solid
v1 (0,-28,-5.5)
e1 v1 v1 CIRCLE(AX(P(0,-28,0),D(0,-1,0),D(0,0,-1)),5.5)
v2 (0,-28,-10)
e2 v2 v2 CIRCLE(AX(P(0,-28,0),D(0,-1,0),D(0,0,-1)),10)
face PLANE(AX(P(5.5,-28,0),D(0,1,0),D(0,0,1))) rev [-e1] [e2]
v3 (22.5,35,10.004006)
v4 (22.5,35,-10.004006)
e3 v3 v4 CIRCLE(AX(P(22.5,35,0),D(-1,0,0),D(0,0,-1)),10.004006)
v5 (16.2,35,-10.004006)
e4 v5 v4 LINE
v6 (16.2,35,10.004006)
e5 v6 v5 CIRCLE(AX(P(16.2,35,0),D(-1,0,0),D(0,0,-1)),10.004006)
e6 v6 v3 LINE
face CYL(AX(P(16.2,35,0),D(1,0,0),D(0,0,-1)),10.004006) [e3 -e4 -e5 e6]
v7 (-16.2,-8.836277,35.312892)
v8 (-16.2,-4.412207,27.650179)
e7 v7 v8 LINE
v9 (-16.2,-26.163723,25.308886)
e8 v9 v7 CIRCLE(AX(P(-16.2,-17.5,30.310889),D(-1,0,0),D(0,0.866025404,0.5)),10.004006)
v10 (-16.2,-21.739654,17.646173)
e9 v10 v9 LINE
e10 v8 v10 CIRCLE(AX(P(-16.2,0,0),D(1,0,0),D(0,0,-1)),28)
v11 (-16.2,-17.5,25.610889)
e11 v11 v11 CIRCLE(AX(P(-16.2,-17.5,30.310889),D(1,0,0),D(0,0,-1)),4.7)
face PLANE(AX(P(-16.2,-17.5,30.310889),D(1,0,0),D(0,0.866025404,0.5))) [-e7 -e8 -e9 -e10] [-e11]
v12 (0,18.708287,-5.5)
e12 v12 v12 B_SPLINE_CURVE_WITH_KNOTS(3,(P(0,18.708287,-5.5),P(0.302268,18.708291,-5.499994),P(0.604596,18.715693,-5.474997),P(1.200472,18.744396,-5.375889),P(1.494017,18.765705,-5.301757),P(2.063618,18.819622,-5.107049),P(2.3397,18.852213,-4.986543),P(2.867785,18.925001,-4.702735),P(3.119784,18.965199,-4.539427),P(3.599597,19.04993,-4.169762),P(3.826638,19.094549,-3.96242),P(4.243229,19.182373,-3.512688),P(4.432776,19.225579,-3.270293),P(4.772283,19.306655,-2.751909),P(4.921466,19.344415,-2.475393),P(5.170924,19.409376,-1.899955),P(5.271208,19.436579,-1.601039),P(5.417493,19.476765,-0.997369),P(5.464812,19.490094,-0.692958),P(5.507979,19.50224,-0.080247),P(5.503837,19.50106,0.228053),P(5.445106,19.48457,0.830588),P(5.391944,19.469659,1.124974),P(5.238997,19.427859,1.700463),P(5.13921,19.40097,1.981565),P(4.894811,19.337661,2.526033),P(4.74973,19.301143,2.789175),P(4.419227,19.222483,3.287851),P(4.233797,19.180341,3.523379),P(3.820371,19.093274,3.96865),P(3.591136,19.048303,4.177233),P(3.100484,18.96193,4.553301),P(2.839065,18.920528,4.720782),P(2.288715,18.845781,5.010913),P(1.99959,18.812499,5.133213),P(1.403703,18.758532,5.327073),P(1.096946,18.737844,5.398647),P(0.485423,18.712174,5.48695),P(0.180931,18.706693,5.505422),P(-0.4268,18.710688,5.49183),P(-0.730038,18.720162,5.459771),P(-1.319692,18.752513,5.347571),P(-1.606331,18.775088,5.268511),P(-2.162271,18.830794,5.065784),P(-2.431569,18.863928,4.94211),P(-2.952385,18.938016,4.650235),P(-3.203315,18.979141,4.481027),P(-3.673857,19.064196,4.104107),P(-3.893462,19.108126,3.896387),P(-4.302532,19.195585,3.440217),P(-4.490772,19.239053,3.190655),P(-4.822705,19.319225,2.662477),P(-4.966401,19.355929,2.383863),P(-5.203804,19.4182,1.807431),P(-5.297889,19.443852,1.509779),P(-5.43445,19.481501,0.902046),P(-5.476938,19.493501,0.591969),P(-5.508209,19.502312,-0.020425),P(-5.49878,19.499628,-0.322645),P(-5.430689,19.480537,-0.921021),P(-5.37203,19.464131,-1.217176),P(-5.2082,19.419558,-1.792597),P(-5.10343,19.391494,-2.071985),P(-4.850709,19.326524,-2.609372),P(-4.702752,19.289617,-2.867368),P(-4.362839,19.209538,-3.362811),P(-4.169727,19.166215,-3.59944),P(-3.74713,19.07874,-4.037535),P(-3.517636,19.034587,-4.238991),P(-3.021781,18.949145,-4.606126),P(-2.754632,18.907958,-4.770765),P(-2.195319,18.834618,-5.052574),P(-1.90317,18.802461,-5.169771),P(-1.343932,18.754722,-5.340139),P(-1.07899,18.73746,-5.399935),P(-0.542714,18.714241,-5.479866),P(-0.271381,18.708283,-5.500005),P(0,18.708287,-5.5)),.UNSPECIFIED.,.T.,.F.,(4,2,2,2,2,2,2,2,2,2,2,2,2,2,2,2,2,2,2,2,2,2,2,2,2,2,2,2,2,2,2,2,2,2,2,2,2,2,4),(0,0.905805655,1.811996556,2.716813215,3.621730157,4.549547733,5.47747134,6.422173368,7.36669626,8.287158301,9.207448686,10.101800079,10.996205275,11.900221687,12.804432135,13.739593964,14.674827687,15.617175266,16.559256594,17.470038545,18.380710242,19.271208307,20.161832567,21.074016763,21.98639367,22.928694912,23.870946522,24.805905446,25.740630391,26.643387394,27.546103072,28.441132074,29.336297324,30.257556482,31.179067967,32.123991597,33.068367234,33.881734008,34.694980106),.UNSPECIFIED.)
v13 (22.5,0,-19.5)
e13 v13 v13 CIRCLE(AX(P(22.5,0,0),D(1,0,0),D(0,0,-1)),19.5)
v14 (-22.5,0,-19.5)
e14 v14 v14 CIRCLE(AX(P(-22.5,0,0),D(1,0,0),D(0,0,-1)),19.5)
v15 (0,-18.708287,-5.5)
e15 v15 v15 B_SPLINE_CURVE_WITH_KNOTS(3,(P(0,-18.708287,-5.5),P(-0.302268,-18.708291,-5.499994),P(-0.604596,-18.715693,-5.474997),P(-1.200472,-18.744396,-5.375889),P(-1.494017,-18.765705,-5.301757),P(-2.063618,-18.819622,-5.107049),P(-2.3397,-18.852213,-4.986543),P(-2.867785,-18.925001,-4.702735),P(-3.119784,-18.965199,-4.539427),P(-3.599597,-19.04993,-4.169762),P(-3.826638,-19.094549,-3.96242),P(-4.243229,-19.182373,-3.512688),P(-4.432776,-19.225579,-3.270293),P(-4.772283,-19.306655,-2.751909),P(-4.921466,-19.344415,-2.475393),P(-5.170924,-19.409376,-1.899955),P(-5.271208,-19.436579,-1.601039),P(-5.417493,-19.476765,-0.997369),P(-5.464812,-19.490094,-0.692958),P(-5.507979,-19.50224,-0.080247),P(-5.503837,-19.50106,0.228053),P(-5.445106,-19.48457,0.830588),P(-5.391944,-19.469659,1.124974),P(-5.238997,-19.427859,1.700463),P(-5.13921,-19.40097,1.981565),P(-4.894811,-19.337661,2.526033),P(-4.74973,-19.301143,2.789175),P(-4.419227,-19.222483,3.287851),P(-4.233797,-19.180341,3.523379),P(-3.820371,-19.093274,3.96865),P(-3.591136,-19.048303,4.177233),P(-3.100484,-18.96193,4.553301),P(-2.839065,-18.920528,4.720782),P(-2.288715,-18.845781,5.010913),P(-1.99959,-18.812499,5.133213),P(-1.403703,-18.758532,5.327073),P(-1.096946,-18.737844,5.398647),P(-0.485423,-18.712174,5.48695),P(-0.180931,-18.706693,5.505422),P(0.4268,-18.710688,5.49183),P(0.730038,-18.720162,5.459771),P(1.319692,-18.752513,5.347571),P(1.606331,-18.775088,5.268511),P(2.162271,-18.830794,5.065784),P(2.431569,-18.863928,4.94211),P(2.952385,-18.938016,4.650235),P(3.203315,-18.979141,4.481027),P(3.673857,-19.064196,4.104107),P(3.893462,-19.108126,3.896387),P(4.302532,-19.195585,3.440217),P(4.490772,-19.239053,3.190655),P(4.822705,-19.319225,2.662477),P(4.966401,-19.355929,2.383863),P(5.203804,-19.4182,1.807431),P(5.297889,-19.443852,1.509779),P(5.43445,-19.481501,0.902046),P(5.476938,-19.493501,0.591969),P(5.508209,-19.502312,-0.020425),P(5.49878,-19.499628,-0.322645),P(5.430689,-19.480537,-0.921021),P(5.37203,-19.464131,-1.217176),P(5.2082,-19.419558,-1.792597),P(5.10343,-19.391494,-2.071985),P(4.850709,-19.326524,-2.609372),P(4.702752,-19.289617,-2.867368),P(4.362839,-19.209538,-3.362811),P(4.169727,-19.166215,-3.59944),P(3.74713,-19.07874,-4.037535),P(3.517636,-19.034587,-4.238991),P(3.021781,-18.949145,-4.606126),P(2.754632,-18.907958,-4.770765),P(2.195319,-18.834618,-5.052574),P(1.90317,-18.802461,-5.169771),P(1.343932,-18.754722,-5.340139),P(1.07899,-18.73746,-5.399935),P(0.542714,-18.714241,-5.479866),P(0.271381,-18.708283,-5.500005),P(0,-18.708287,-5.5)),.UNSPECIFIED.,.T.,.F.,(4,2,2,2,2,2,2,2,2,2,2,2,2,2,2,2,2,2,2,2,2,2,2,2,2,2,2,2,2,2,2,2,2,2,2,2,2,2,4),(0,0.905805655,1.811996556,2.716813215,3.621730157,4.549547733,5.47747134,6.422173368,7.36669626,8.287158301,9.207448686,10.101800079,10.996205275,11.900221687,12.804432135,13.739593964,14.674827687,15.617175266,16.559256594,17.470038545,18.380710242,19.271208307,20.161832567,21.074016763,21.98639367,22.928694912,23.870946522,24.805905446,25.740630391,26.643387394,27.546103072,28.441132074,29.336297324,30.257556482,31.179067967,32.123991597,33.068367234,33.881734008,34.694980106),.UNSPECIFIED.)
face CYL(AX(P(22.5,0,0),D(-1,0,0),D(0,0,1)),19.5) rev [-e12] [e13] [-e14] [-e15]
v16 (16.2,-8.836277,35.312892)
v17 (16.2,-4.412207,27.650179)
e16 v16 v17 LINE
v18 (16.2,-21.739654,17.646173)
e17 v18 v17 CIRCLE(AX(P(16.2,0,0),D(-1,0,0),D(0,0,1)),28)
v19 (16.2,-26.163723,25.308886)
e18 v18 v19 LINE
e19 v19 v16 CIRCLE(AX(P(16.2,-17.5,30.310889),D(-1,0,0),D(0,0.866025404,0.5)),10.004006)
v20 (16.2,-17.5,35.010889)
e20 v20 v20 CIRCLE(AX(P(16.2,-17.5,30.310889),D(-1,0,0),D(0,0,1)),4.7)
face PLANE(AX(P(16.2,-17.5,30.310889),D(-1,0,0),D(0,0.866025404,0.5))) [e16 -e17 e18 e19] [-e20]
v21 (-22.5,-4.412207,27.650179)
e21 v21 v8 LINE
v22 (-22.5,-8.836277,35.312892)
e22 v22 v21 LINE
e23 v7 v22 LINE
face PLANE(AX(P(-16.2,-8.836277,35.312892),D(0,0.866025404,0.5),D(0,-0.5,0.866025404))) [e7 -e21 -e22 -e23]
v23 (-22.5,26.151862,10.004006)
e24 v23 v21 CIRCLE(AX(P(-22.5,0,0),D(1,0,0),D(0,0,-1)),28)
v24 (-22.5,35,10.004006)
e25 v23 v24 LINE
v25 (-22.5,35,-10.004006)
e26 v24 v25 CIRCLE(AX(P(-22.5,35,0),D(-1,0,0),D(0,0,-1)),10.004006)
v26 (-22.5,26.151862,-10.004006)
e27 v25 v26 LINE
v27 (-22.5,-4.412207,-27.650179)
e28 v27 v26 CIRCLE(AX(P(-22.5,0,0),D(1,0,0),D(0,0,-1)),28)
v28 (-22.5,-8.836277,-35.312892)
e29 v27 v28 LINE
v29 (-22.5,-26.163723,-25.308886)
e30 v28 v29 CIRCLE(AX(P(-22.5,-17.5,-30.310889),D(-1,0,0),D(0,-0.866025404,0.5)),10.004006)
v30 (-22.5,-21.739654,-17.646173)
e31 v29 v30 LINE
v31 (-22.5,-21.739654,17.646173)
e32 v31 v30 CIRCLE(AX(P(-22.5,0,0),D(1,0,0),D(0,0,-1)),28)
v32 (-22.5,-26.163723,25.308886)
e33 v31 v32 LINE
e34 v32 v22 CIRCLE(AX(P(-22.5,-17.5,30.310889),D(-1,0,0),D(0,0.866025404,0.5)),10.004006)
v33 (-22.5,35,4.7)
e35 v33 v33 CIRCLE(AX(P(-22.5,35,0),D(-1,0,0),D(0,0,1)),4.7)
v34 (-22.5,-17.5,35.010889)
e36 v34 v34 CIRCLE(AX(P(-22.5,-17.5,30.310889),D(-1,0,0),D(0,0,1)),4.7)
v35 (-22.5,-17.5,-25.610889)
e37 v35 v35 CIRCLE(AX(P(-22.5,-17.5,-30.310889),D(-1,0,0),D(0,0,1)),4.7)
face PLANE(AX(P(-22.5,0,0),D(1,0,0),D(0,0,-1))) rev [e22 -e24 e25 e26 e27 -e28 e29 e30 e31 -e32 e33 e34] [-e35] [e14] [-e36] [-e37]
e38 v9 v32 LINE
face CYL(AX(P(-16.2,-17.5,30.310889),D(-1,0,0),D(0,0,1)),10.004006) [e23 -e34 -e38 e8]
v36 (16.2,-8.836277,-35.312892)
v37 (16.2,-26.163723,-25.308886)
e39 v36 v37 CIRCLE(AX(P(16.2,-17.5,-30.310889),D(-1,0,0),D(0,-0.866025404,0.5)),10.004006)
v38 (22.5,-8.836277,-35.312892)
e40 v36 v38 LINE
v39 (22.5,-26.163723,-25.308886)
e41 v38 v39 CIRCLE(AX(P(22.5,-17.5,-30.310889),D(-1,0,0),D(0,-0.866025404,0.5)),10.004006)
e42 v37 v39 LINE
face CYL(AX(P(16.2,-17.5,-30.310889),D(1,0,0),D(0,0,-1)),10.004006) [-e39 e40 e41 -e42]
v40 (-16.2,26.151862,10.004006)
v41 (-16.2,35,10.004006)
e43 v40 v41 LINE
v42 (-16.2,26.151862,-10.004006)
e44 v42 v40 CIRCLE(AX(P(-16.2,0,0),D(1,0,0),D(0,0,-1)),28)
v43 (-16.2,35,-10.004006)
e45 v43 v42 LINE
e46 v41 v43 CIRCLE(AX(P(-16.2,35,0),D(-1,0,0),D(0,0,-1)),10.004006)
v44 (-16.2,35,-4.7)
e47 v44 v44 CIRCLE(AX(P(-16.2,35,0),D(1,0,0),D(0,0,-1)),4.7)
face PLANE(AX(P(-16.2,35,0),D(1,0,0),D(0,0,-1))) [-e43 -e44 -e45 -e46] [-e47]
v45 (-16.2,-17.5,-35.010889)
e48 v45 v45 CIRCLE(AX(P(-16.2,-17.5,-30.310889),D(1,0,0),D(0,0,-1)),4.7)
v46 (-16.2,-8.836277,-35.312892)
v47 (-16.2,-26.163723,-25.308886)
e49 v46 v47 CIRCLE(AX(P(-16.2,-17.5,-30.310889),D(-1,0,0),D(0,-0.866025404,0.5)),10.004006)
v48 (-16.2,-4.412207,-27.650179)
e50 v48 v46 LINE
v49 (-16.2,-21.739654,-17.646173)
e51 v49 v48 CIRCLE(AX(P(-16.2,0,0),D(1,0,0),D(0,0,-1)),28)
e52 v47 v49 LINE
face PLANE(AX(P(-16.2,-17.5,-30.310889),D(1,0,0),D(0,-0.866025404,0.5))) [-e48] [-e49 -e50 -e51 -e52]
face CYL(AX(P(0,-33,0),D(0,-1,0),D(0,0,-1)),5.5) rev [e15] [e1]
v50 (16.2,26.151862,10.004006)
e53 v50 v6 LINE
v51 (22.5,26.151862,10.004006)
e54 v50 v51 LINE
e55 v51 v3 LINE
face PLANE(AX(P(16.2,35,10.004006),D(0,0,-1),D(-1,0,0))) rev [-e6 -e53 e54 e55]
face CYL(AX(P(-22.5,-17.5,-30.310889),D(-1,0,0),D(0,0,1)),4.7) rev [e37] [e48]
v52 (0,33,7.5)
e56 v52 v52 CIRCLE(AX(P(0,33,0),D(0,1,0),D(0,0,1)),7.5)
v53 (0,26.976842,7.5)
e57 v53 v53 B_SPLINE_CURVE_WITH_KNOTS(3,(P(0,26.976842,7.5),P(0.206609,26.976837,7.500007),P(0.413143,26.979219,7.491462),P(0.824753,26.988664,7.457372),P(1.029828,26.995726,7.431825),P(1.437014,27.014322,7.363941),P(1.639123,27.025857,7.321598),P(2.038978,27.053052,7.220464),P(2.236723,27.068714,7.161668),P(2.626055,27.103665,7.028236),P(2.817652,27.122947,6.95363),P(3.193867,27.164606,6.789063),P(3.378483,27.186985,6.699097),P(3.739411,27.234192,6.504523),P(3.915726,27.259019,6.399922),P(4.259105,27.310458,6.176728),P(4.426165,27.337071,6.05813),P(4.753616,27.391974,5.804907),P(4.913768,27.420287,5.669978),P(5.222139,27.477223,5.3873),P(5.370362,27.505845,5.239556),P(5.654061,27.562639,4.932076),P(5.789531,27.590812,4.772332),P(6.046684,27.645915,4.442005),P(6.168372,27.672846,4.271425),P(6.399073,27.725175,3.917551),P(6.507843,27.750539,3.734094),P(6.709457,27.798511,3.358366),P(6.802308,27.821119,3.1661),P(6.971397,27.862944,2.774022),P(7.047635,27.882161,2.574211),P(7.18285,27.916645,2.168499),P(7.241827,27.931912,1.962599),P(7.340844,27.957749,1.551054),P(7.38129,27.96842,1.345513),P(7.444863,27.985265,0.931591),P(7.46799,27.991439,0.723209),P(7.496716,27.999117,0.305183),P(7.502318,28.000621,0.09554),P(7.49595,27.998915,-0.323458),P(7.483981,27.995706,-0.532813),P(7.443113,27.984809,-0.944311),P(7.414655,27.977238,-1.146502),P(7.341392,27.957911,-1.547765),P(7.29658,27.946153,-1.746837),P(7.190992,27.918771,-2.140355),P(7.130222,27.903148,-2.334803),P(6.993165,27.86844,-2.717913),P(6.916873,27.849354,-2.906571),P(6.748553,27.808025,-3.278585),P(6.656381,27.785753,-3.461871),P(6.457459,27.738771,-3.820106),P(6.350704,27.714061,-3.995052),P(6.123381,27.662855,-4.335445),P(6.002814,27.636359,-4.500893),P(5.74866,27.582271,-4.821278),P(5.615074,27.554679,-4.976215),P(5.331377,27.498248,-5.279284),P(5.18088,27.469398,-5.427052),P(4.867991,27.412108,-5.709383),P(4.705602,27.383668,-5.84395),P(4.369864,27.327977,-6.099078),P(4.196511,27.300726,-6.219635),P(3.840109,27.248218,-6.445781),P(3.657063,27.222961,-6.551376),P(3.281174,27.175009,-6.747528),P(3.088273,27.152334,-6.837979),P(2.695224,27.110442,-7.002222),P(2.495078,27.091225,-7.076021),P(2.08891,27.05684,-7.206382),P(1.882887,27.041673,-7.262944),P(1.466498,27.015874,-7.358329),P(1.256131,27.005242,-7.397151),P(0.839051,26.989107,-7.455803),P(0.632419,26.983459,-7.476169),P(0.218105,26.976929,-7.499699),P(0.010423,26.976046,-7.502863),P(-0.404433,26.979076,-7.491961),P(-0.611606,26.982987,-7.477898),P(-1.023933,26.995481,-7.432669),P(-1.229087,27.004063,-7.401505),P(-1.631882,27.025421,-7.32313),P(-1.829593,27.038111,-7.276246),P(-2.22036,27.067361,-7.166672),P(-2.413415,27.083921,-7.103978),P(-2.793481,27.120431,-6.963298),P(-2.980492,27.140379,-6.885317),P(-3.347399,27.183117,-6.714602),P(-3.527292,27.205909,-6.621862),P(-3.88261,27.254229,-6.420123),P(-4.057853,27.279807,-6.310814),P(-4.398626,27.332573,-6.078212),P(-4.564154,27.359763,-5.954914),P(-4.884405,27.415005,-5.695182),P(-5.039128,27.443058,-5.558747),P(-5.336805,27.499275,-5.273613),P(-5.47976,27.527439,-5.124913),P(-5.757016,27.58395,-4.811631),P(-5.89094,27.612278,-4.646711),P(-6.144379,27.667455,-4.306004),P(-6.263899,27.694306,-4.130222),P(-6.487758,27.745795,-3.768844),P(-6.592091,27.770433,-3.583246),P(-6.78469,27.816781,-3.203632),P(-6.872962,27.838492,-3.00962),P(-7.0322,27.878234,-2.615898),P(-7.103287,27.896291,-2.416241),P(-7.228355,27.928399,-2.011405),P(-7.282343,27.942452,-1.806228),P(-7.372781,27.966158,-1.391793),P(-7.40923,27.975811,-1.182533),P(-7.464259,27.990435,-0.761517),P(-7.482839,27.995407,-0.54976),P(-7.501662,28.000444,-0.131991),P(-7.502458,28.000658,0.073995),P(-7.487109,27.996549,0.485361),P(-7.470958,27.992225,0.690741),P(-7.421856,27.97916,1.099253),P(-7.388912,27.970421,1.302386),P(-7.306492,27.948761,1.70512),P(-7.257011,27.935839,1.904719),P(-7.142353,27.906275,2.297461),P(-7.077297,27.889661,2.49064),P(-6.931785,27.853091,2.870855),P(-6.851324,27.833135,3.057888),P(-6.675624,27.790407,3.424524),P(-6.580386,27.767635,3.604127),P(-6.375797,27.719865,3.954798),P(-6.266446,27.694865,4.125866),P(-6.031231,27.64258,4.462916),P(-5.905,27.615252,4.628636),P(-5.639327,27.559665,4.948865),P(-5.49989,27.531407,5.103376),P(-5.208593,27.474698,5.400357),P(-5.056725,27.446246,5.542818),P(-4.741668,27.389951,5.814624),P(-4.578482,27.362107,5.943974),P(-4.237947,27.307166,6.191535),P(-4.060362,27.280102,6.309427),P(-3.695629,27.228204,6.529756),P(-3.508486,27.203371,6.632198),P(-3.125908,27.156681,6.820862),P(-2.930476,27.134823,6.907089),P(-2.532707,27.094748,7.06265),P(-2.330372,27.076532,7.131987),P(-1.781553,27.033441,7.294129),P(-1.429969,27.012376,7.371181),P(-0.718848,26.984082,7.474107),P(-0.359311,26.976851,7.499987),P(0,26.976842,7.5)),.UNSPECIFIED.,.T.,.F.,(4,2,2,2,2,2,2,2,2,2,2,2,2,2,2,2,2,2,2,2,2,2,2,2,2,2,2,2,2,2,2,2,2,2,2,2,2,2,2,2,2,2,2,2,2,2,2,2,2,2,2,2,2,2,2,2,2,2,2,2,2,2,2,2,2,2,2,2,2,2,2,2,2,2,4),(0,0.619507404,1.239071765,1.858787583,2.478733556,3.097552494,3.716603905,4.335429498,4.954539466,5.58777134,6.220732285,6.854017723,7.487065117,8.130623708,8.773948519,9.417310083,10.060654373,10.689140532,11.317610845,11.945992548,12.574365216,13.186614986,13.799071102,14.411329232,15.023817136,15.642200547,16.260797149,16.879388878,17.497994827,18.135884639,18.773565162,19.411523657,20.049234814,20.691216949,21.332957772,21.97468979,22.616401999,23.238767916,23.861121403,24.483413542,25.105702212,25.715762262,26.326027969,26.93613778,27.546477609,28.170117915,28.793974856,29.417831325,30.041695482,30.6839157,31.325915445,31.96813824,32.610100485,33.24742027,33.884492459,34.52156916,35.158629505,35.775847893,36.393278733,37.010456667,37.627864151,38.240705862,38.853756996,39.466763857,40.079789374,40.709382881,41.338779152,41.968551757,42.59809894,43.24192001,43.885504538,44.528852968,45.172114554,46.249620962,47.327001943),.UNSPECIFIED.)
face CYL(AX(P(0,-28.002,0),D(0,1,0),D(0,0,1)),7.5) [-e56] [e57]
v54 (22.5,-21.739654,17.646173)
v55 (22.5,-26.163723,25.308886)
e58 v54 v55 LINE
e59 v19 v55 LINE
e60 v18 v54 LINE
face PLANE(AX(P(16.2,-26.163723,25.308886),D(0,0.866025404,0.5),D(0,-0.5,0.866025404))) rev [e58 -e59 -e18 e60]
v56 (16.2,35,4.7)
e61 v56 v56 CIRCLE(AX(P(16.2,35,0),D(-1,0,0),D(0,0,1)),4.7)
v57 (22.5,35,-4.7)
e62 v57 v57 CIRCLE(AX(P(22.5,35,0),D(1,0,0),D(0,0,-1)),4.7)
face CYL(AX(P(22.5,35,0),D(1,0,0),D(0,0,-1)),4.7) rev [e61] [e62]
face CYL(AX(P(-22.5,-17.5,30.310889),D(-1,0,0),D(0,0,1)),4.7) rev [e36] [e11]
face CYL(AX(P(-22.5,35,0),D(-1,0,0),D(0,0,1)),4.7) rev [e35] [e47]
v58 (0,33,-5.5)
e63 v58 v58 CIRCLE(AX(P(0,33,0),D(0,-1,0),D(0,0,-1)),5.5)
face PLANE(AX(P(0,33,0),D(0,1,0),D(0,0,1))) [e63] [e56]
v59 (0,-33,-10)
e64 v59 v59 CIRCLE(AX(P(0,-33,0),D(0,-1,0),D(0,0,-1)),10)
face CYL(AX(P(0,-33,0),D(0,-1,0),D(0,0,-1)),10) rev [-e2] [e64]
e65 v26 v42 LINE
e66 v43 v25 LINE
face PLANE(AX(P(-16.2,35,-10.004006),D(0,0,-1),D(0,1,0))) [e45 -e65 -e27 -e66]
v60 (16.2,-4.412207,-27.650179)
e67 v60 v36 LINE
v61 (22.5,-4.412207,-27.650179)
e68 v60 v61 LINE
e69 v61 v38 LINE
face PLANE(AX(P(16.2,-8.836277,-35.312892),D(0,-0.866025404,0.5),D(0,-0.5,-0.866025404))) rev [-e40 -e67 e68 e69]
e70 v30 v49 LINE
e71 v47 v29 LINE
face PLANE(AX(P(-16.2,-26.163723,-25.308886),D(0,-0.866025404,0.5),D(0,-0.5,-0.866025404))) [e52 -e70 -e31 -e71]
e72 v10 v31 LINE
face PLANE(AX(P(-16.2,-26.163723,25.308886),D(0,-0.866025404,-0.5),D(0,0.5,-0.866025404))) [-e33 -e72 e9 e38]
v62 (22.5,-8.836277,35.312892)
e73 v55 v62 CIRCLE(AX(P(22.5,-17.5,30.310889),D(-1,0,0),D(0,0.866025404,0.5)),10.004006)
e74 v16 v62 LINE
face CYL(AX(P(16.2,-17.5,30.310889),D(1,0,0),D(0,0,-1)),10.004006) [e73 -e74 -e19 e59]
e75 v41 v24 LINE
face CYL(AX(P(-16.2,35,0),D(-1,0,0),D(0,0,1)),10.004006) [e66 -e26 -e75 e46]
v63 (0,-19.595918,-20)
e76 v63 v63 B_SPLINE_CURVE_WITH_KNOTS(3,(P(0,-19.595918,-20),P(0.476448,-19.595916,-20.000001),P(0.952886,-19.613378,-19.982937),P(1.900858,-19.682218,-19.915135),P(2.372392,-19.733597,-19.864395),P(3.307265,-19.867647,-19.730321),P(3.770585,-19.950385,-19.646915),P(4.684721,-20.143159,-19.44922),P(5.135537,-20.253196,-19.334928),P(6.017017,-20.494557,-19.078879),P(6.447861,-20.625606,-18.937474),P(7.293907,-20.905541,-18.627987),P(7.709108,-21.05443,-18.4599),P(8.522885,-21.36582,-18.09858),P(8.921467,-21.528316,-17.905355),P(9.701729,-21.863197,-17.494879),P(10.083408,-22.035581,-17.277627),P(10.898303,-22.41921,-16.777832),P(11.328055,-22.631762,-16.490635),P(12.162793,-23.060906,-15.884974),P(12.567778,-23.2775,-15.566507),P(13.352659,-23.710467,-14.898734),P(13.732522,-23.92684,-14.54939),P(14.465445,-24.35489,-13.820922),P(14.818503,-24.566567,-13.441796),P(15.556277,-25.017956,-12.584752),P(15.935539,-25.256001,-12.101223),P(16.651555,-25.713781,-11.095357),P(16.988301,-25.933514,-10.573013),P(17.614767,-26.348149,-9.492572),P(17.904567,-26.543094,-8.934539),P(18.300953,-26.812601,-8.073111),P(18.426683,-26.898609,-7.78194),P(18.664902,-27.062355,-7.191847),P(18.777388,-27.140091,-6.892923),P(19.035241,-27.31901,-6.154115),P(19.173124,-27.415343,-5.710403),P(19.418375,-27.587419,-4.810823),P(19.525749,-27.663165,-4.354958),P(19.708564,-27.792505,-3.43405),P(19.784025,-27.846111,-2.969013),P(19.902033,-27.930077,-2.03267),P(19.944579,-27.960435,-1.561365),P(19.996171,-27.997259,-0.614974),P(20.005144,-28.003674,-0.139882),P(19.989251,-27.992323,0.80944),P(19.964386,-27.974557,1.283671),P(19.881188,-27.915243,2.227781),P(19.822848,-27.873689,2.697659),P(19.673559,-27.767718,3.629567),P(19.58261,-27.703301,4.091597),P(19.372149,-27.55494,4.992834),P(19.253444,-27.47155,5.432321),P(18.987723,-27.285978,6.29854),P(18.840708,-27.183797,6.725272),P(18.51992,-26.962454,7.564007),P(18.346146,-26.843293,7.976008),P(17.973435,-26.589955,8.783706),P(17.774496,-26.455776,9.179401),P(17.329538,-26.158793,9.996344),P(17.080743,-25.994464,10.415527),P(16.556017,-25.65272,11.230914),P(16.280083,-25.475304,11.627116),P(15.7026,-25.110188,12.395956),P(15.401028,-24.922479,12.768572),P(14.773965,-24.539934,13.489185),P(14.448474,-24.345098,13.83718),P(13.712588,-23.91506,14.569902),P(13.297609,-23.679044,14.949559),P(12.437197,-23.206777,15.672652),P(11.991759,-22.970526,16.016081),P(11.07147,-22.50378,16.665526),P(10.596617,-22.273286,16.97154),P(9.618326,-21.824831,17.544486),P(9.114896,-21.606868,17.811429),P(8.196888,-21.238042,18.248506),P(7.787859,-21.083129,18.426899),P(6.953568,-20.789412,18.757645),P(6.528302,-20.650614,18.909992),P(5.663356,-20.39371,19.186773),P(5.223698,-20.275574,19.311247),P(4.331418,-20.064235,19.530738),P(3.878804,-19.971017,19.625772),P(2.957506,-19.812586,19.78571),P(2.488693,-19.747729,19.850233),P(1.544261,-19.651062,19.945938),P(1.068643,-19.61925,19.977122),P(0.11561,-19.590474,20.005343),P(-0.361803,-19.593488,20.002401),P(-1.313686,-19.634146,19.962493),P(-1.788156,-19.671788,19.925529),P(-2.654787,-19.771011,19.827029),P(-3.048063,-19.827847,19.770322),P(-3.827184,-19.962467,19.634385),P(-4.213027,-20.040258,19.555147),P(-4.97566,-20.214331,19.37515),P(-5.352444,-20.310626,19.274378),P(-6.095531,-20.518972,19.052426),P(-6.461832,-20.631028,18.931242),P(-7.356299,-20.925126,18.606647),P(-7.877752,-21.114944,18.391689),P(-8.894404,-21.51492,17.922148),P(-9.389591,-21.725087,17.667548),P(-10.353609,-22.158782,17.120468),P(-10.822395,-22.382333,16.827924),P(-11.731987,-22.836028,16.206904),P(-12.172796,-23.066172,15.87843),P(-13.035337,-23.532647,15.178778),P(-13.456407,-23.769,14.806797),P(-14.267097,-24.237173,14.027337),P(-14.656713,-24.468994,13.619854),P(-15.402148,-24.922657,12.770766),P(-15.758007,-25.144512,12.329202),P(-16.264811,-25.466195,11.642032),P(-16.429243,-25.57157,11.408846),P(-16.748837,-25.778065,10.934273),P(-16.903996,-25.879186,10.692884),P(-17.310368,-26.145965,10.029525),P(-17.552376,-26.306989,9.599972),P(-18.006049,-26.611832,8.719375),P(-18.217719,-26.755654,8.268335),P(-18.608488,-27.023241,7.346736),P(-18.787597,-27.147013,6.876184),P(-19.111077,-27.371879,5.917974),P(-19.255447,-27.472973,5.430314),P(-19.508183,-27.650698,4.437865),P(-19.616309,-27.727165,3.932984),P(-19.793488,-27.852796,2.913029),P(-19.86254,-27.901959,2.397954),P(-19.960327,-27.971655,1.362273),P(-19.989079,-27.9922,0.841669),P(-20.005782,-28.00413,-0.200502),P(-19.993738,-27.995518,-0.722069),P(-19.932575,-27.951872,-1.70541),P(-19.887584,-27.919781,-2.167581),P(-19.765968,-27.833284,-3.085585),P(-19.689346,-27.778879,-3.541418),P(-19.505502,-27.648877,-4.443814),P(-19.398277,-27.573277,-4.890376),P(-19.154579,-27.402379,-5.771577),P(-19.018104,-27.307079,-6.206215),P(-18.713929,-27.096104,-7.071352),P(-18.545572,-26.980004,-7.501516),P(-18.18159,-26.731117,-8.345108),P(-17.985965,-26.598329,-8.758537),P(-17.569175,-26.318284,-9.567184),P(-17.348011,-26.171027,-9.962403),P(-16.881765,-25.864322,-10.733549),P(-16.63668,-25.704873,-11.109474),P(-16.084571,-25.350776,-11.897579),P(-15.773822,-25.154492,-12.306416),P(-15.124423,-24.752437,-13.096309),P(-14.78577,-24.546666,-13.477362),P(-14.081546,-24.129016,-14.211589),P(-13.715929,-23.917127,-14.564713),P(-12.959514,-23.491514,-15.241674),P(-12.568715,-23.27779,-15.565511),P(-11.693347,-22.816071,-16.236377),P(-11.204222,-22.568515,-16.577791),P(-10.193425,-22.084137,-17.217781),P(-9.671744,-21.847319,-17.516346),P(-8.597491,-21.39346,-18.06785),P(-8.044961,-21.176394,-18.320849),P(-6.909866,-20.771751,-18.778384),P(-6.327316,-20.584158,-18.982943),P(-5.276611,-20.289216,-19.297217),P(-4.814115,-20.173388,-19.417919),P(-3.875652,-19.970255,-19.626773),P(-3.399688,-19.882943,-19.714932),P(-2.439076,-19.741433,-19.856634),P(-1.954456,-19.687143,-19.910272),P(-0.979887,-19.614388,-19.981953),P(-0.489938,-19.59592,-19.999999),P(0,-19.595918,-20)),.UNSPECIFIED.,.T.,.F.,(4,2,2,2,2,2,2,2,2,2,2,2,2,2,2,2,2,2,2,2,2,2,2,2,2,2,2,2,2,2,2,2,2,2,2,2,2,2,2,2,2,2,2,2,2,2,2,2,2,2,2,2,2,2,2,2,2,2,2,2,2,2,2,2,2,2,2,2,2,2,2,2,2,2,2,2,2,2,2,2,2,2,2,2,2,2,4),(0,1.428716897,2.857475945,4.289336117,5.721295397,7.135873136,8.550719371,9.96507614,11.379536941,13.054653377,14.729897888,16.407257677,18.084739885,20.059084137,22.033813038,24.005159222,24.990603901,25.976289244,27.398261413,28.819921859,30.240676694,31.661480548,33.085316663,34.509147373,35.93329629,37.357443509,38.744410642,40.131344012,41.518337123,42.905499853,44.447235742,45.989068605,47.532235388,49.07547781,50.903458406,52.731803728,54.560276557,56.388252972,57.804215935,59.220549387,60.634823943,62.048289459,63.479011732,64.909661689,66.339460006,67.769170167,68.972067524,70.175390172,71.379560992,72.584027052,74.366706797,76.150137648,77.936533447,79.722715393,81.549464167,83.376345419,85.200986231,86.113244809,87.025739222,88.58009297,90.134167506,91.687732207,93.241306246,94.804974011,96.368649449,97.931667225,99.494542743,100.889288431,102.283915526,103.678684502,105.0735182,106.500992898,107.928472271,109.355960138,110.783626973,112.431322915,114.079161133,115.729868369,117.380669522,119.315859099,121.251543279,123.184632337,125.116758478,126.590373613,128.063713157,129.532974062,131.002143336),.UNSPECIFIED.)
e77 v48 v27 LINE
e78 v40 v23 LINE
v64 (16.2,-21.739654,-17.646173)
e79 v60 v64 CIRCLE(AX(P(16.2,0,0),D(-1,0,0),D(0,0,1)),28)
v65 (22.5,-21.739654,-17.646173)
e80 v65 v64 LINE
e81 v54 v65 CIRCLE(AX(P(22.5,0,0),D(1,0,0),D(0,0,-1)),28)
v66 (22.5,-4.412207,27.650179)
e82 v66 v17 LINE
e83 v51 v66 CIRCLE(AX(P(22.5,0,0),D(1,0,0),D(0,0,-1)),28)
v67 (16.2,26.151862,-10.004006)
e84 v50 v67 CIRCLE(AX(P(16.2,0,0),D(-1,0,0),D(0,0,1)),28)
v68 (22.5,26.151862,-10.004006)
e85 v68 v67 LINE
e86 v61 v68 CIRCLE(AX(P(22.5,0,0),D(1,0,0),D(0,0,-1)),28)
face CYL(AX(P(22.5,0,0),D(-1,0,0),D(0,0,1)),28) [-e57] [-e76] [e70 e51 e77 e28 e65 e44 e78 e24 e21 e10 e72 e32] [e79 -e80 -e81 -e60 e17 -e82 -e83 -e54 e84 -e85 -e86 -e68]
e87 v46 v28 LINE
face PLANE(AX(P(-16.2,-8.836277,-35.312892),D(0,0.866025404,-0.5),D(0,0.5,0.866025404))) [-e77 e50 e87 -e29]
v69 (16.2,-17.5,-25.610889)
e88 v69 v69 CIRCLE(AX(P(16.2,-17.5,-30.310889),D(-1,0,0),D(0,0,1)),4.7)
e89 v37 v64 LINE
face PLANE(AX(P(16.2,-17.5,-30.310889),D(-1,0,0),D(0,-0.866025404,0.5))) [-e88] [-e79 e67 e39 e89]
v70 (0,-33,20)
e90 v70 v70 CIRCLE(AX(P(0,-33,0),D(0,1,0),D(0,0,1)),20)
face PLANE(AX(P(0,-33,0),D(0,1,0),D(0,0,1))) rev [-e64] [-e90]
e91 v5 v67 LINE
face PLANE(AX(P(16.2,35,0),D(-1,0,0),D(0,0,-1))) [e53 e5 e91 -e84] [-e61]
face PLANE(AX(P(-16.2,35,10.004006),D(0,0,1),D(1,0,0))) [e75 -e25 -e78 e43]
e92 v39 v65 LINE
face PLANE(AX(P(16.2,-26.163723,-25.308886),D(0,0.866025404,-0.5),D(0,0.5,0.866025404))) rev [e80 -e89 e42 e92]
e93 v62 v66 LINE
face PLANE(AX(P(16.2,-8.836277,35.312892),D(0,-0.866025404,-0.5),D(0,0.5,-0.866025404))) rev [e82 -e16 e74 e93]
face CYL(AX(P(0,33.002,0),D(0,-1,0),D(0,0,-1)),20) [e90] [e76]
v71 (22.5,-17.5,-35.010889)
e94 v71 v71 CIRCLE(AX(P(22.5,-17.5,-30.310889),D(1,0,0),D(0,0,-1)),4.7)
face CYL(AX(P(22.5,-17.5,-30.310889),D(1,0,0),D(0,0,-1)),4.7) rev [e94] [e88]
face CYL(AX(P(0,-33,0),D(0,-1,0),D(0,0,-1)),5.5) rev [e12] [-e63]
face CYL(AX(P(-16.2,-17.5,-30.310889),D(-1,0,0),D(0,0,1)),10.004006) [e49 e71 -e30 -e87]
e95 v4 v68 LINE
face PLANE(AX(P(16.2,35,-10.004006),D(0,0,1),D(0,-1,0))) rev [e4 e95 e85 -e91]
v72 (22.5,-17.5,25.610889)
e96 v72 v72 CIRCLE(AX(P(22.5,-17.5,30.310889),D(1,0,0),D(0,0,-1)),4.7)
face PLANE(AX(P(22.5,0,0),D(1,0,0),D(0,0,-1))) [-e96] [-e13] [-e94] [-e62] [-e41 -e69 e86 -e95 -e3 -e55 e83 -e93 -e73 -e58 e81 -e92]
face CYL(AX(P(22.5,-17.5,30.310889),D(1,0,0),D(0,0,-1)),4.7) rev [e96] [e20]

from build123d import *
from build123d.topology import SkipClean

# Parameters (mm, degrees)
SKETCH1_R                = 28
SKETCH1_R_2              = 19.5
BOSS_EXTRUDE1_DEPTH      = 22.5
BOSS_EXTRUDE2_REACH      = 72.79
BOSS_EXTRUDE2_END_RADIUS = 28
SKETCH2_R                = 7.5
BOSS_EXTRUDE3_REACH      = 77.142
BOSS_EXTRUDE3_END_RADIUS = 28
SKETCH3_R                = 20
HOLE1_D                  = 11
HOLE1_CBORE_D            = 20
HOLE1_CBORE_DEPTH        = 5
BOSS_EXTRUDE4_DEPTH      = 6.3
CIRPATTERN2_COUNT        = 3
MIRROR3_COPY_1_DEPTH     = 6.3
MIRROR3_COPY_2_DEPTH     = 6.3
HOLE4_D                  = 9.4
HOLE4_DEPTH              = 6.3
HOLE5_D                  = 9.4
HOLE5_DEPTH              = 6.3


with BuildPart() as part:
    # Sketch1 → Boss-Extrude1 (new, symmetric)
    with BuildSketch(Plane(origin=(0, 0, 0), x_dir=(0, 0, -1), z_dir=(1, 0, 0))):
        with Locations(Location((0, 0, 0), (0, 0, 180))):
            Circle(SKETCH1_R)
        with Locations(Location((0, 0, 0), (0, 0, 180))):
            Circle(SKETCH1_R_2, mode=Mode.SUBTRACT)
    extrude(amount=BOSS_EXTRUDE1_DEPTH, both=True)

    # Boss-Extrude2: up to this cylinder (the profile starts outside it)
    boss_extrude2_end = Plane(origin=(0, 0, 0), z_dir=(-1, 0, 0)) * Cylinder(BOSS_EXTRUDE2_END_RADIUS, 202.58, mode=Mode.PRIVATE)
    # Sketch2 → Boss-Extrude2 (add, up to the surface)
    with BuildSketch(Plane(origin=(0, 33, 0), x_dir=(1, 0, 0), z_dir=(0, 1, 0)), mode=Mode.PRIVATE) as boss_extrude2_sk1:
        with Locations(Location((0, 0, 0), (0, 0, 270))):
            Circle(SKETCH2_R)
    boss_extrude2_tool1 = extrude(boss_extrude2_sk1.sketch, amount=-BOSS_EXTRUDE2_REACH, mode=Mode.PRIVATE) - boss_extrude2_end
    add(boss_extrude2_tool1.solids().sort_by_distance((0, 33, 0))[0])

    # Boss-Extrude3: up to this cylinder (the profile starts outside it)
    boss_extrude3_end = Plane(origin=(0, 0, 0), z_dir=(-1, 0, 0)) * Cylinder(BOSS_EXTRUDE3_END_RADIUS, 211.284, mode=Mode.PRIVATE)
    # Sketch3 → Boss-Extrude3 (add, up to the surface)
    with BuildSketch(Plane(origin=(0, -33, 0), x_dir=(1, 0, 0), z_dir=(0, 1, 0)), mode=Mode.PRIVATE) as boss_extrude3_sk1:
        with Locations(Location((0, 0, 0), (0, 0, 90))):
            Circle(SKETCH3_R)
    boss_extrude3_tool1 = extrude(boss_extrude3_sk1.sketch, amount=BOSS_EXTRUDE3_REACH, mode=Mode.PRIVATE) - boss_extrude3_end
    add(boss_extrude3_tool1.solids().sort_by_distance((0, -33, 0))[0])

    # Hole1 (through all)
    with Locations(Plane(origin=(0, -33, 0), x_dir=(-1, 0, 0), z_dir=(0, -1, 0))):
        with Locations((0, 0)):
            CounterBoreHole(HOLE1_D / 2, HOLE1_CBORE_D / 2, HOLE1_CBORE_DEPTH)

    # Sketch6 → Boss-Extrude4 (add)
    with BuildSketch(Plane.ZY.offset(22.5)):
        with BuildLine():
            Line((-10.004005993, 35), (-10.004005993, 16.738275422))
            ThreePointArc((-10.004005993, 16.738275422), (0, 19.5), (10.004005993, 16.738275422))
            Line((10.004005993, 16.738275422), (10.004005993, 35))
            ThreePointArc((10.004005993, 35), (0, 45.004005993), (-10.004005993, 35))
        make_face()
    boss_extrude4 = extrude(amount=-BOSS_EXTRUDE4_DEPTH)

    # CirPattern2: Boss-Extrude4 ×3 about axis
    with SkipClean():  # the faces are left unmerged after this step: merging them gives an invalid solid
        cirpattern2_axis = Axis((0, 0, 0), (1, 0, 0))
        for i in range(1, CIRPATTERN2_COUNT):
            add(boss_extrude4.rotate(cirpattern2_axis, i * 360 / CIRPATTERN2_COUNT))

    # Mirror3: Boss-Extrude4 across plane
    add(boss_extrude4.mirror(Plane(origin=(0, 0, 0), x_dir=(0, 0, 1), z_dir=(1, 0, 0))))

    # Mirror3 copy 1 sketch → Mirror3 copy 1 (add)
    with SkipClean():  # the faces are left unmerged after this step: merging them gives an invalid solid
        with BuildSketch(Plane(origin=(22.5, 0, 0), x_dir=(0, -0.8660254037844387, -0.4999999999999998), z_dir=(1, 0, 0))):
            with BuildLine():
                Line((-10.004005993, -35), (-10.004005993, -16.738275422))
                ThreePointArc((-10.004005993, -16.738275422), (0, -19.5), (10.004005993, -16.738275422))
                Line((10.004005993, -16.738275422), (10.004005993, -35))
                ThreePointArc((10.004005993, -35), (0, -45.004005993), (-10.004005993, -35))
            make_face()
        extrude(amount=-MIRROR3_COPY_1_DEPTH)

    # Mirror3 copy 2 sketch → Mirror3 copy 2 (add)
    with SkipClean():  # the faces are left unmerged after this step: merging them gives an invalid solid
        with BuildSketch(Plane(origin=(22.5, 0, 0), x_dir=(0, 0.8660254037844384, -0.5000000000000004), z_dir=(1, 0, 0))):
            with BuildLine():
                Line((-10.004005993, -35), (-10.004005993, -16.738275422))
                ThreePointArc((-10.004005993, -16.738275422), (0, -19.5), (10.004005993, -16.738275422))
                Line((10.004005993, -16.738275422), (10.004005993, -35))
                ThreePointArc((10.004005993, -35), (0, -45.004005993), (-10.004005993, -35))
            make_face()
        extrude(amount=-MIRROR3_COPY_2_DEPTH)
    add(part.part.scale(1), mode=Mode.REPLACE)  # the faces are merged on a copy

    # Hole4
    with Locations(Plane.ZY.offset(22.5)):
        with Locations((30.310889132, -17.5), (0, 35), (-30.310889132, -17.5)):
            Hole(HOLE4_D / 2, depth=HOLE4_DEPTH)

    # Hole5
    with Locations(Plane(origin=(22.5, 0, 0), x_dir=(0, 0, -1), z_dir=(1, 0, 0))):
        with Locations((0, 35), (30.310889132, -17.5), (-30.310889132, -17.5)):
            Hole(HOLE5_D / 2, depth=HOLE5_DEPTH)


solid = part.part
